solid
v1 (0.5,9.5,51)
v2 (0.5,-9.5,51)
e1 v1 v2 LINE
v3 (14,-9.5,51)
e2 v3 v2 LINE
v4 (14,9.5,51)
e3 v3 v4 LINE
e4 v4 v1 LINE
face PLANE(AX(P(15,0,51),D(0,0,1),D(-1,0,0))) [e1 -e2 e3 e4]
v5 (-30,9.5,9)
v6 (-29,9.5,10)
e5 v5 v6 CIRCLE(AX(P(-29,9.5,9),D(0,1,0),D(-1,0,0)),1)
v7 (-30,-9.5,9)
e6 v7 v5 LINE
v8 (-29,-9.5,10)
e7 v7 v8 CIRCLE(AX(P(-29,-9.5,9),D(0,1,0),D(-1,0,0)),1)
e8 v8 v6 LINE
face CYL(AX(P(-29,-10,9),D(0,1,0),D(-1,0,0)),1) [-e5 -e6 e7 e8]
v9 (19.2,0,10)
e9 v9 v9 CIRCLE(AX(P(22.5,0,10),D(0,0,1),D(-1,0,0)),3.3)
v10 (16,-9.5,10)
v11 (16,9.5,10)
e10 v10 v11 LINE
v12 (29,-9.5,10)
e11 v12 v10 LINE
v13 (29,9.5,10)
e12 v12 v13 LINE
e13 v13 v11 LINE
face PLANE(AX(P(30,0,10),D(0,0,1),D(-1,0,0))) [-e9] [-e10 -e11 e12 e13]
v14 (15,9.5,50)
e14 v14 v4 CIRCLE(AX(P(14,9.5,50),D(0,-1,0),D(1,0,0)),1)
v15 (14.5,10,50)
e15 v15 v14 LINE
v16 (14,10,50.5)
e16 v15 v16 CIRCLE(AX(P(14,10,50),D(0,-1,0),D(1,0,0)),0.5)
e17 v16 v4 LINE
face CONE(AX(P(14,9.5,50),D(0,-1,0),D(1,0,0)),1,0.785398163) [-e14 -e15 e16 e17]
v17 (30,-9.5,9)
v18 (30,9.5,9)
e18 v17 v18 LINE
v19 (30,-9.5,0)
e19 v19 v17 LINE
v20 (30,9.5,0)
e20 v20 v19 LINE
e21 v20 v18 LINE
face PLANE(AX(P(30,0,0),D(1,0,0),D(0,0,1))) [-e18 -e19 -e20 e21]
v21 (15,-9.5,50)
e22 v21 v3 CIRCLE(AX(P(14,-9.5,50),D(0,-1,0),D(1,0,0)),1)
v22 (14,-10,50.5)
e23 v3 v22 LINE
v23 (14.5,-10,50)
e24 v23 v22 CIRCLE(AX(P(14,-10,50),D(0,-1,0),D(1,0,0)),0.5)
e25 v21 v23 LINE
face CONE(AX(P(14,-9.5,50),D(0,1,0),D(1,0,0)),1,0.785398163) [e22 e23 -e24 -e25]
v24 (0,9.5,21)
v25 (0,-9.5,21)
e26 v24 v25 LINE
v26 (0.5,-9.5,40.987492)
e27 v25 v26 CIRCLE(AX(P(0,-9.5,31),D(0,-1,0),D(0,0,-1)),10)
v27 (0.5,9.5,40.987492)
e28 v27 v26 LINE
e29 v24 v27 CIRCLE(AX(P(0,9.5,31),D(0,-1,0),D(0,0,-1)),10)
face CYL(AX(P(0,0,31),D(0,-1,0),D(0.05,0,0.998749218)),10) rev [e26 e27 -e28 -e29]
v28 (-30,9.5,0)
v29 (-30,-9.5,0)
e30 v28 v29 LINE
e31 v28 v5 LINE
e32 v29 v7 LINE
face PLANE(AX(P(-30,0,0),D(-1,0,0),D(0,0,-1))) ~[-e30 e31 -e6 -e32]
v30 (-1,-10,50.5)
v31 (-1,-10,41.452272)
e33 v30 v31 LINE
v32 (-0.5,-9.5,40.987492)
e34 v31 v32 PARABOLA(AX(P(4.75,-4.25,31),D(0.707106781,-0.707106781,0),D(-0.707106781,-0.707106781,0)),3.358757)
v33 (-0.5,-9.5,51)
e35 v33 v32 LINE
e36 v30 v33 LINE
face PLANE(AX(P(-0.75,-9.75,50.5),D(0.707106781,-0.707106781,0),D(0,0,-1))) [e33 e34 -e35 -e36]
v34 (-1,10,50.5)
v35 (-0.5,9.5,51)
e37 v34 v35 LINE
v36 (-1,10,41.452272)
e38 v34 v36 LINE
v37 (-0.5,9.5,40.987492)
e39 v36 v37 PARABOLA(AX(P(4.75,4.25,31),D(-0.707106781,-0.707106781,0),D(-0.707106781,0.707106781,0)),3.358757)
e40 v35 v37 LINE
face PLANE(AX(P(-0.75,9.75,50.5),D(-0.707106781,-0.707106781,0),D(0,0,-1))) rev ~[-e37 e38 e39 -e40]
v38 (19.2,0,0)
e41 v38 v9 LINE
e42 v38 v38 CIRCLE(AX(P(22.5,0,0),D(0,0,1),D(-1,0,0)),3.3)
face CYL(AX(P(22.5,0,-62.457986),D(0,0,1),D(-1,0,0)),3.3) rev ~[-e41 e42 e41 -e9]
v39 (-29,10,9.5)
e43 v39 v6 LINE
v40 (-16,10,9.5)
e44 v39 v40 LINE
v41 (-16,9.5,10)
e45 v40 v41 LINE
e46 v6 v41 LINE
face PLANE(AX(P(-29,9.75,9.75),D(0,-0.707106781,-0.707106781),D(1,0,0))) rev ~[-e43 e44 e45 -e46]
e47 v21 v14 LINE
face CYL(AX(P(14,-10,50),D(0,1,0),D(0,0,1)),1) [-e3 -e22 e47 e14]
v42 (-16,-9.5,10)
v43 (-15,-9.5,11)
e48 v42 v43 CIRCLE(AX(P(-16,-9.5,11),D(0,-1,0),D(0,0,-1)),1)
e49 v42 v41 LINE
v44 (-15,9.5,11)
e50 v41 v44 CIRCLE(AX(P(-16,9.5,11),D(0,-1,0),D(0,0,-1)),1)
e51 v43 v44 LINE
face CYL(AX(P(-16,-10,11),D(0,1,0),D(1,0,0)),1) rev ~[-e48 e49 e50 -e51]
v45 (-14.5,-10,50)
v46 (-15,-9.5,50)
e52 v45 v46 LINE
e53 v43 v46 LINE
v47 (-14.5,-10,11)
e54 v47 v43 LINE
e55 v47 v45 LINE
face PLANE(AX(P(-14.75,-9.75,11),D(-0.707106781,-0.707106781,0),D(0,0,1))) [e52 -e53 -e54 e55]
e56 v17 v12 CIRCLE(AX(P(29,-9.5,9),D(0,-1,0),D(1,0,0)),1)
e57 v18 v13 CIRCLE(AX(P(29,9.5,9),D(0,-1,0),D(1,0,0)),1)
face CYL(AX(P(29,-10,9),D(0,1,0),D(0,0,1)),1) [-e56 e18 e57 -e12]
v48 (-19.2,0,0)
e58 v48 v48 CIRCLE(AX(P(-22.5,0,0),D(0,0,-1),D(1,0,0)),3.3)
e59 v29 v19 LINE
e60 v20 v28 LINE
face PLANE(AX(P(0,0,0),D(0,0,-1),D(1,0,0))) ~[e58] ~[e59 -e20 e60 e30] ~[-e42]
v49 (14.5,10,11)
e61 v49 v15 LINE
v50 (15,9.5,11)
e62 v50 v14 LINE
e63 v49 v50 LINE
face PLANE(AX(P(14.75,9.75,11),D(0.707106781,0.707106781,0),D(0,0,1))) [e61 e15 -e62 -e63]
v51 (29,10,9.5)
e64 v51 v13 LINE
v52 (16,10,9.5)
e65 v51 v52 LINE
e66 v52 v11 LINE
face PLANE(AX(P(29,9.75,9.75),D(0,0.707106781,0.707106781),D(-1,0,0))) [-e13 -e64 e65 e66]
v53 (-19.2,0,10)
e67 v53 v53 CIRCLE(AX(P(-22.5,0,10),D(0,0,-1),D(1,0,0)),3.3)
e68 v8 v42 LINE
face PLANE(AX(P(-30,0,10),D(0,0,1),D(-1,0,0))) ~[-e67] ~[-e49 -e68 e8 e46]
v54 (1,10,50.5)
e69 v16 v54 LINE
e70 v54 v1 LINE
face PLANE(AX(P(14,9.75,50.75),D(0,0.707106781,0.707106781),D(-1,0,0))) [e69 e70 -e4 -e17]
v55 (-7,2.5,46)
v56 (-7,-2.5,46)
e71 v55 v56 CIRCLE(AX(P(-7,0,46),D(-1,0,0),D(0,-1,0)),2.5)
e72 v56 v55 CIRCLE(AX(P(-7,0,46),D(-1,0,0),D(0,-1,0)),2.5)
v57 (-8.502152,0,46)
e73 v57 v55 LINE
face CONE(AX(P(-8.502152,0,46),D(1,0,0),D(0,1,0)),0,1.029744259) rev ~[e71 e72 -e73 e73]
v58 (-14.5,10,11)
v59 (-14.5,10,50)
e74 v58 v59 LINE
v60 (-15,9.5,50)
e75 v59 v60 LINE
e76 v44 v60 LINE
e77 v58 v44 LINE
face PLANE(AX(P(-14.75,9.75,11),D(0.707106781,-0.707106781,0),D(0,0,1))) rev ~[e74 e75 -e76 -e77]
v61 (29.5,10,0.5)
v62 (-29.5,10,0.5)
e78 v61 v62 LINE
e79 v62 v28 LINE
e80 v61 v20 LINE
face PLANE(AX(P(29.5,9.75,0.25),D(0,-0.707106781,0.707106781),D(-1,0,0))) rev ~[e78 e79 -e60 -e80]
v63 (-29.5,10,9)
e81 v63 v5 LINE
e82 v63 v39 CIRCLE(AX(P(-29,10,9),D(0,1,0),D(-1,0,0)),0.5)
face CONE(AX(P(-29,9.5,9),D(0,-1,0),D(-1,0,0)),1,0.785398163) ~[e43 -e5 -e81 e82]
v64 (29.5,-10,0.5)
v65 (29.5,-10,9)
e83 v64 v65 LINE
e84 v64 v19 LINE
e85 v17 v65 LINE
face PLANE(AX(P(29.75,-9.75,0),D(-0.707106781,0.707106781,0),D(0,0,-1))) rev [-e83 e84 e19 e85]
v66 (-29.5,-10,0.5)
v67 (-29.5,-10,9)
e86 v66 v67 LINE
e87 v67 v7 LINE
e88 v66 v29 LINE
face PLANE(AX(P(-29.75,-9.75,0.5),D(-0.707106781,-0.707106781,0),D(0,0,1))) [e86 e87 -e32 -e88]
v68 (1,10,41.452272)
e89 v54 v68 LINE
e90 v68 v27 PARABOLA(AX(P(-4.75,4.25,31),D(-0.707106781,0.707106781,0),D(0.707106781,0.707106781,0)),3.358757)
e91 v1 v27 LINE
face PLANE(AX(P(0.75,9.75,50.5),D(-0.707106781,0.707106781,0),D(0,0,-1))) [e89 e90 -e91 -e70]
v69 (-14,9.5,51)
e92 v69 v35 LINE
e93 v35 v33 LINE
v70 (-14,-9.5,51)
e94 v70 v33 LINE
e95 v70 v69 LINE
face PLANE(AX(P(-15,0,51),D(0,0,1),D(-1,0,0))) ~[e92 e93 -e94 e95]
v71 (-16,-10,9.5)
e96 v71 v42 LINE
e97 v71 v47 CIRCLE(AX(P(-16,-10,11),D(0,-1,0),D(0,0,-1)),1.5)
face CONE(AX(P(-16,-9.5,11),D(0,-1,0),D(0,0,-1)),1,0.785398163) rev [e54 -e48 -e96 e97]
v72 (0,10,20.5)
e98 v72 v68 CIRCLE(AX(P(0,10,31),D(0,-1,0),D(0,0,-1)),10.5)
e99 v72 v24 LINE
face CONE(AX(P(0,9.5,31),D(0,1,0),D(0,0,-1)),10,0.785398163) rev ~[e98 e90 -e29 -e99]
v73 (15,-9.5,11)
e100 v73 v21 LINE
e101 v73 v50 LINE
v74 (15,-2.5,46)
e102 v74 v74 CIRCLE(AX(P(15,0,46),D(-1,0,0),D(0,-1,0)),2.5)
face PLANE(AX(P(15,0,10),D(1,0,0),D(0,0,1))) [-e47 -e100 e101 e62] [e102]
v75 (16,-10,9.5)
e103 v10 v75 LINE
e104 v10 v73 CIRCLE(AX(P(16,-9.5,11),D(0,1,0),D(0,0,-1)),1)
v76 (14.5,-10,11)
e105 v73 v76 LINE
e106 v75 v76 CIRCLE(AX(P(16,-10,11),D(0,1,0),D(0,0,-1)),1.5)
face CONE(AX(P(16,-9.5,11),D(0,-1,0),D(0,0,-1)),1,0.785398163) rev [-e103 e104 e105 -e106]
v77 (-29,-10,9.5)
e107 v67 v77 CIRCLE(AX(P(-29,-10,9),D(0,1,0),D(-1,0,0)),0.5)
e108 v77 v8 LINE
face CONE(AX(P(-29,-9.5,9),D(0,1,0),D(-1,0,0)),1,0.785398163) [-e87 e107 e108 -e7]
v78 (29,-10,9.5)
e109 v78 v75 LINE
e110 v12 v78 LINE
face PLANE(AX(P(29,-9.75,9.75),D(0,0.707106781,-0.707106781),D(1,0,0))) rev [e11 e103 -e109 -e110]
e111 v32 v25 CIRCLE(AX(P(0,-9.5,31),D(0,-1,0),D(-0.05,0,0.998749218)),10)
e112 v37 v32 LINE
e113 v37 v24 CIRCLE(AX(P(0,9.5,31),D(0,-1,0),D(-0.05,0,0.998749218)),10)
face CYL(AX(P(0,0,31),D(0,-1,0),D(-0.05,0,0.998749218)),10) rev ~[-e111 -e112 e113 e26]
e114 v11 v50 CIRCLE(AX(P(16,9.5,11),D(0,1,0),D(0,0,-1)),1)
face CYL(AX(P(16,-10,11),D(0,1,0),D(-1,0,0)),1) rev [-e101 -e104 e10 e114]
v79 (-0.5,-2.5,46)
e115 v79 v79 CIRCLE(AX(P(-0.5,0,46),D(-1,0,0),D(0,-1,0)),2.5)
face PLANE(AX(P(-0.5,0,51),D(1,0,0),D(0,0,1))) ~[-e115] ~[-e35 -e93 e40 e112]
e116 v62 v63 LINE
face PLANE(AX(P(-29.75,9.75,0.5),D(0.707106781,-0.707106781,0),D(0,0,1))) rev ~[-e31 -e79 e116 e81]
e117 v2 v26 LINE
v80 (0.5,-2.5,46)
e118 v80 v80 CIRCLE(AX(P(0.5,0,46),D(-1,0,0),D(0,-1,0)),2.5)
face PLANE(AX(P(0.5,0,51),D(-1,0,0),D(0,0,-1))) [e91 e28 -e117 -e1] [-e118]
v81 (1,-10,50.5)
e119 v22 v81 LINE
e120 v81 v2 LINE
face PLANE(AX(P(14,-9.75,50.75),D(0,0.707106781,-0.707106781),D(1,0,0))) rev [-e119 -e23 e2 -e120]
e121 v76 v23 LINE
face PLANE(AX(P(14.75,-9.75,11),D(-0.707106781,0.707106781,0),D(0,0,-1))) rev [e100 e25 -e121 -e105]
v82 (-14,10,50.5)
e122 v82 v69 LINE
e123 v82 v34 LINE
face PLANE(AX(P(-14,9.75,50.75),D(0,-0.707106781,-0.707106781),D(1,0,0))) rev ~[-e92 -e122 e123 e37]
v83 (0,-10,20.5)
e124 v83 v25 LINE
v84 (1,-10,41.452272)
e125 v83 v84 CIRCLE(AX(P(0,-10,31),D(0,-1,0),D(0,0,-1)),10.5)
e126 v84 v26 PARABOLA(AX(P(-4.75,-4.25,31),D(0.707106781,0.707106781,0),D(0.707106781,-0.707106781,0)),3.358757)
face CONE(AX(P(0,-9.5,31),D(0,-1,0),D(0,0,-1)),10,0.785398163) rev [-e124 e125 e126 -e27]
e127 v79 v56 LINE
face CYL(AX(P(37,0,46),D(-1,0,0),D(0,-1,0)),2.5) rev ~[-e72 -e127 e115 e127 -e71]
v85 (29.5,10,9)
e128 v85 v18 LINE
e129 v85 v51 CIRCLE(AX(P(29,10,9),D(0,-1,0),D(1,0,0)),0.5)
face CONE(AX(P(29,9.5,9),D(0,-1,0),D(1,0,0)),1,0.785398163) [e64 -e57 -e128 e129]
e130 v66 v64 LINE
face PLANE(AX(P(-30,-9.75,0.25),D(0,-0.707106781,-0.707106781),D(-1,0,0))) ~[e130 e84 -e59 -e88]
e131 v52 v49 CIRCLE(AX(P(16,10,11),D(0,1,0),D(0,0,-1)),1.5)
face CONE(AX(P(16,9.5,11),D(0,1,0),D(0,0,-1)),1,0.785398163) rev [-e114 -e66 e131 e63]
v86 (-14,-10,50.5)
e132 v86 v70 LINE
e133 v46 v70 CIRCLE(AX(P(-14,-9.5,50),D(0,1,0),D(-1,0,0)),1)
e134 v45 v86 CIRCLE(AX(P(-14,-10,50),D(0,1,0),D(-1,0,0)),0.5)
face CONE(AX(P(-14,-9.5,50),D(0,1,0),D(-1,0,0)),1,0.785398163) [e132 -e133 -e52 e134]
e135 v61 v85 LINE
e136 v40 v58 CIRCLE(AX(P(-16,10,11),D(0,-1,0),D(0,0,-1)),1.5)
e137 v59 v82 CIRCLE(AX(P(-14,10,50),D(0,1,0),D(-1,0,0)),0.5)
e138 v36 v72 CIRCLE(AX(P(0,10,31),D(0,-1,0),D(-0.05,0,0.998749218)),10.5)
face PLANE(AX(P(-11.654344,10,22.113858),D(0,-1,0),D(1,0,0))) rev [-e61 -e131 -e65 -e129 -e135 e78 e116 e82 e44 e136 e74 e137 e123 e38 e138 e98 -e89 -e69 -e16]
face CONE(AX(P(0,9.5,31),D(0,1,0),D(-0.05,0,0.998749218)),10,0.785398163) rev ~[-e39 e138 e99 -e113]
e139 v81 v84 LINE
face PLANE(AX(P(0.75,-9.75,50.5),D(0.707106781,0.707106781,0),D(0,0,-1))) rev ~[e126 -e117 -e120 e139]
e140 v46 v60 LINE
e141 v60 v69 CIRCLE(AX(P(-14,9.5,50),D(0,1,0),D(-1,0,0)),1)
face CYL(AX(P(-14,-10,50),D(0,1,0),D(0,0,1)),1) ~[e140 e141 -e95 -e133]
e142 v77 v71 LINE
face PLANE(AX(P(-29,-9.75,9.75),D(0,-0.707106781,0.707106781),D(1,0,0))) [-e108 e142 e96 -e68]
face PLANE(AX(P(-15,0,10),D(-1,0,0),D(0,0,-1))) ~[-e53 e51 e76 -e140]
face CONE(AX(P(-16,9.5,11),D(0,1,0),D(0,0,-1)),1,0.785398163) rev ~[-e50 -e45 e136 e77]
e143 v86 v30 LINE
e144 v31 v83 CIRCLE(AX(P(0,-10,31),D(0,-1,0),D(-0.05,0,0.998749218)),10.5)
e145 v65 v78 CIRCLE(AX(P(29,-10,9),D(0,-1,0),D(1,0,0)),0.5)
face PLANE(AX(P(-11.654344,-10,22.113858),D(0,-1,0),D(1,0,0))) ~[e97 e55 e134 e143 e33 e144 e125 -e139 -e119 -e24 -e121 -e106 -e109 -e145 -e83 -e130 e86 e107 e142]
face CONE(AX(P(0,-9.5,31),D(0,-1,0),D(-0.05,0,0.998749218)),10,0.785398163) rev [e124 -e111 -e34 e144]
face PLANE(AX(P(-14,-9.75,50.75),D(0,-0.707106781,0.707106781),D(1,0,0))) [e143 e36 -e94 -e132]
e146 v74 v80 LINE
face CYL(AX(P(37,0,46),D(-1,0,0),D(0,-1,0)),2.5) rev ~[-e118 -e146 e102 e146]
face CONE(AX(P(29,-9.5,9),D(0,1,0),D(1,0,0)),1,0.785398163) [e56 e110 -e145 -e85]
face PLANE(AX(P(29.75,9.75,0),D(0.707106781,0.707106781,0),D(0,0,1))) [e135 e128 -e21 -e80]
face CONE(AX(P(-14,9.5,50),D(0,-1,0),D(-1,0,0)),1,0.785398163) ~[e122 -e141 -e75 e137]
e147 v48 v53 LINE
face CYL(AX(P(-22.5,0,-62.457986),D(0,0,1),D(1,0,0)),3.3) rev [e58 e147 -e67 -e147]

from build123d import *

# Parameters (mm, degrees)
F1_DEPTH    = 10
F3_D        = 6.6
F6_D        = 5
F6_DEPTH    = 22
F6_TIP      = 1.5021515476
F7_R        = 1
F8_C1_SIZE  = 0.5
F8_C2_SIZE  = 0.5
F8_C3_SIZE  = 0.5
F8_C4_SIZE  = 0.5
F8_C5_SIZE  = 0.5
F8_C6_SIZE  = 0.5
F8_C7_SIZE  = 0.5
F8_C8_SIZE  = 0.5
F8_C9_SIZE  = 0.5
F8_C10_SIZE = 0.5
F8_C11_SIZE = 0.5
F8_C12_SIZE = 0.5


with BuildPart() as f1:
    # F0 (on Front) → F1 (new body, symmetric)
    with BuildSketch(Plane.XZ):
        with BuildLine():
            Line((15, 51), (0.5, 51))
            Line((0.5, 51), (0.5, 40.9874921777))
            ThreePointArc((0.5, 40.9874921777), (9.9968725554, 30.7499217894), (0, 21))
            Line((0, 21), (0, 0))
            Line((0, 0), (30, 0))
            Line((30, 0), (30, 10))
            Line((30, 10), (15, 10))
            Line((15, 10), (15, 51))
        make_face()
    extrude(amount=F1_DEPTH, both=True)

    # F3 (through all)
    with Locations(Plane(origin=(0, 0, 0), x_dir=(1, 0, 0), z_dir=(0, 0, -1))):
        with Locations((22.5, 0)):
            Hole(F3_D / 2)

    # F4: F1 across plane


with BuildPart() as f1_1:
    add(f1.part)
    add(f1.part.mirror(Plane.YZ))

    # F6
    with Locations(Plane.YZ.offset(15)):
        with Locations((0, 46)):
            Hole(F6_D / 2, depth=F6_DEPTH)
            with Locations((0, 0, -(F6_DEPTH + F6_TIP / 2))):  # 118° drill point
                Cone(0, F6_D / 2, F6_TIP, mode=Mode.SUBTRACT)

    # F7
    f7_edges = [f1_1.edges().sort_by_distance(p)[0] for p in [
        (15, 0, 10),
        (-15, 0, 10),
        (-30, 0, 10),
        (30, 0, 10),
        (15, 0, 51),
        (-15, 0, 51),
    ]]
    fillet(f7_edges, radius=F7_R)

    # F8: chamfer of 0.5 on 36 edges, made by hand

    # F8_c1
    f8_c1_edges = [f1_1.edges().sort_by_distance(p)[0] for p in [
        (30, 10, 4.5),
        (29.7071067812, 10, 9.7071067812),
        (22.5, 10, 10),
        (15.2928932188, 10, 10.2928932188),
        (15, 10, 30.5),
        (14.7071067812, 10, 50.7071067812),
        (7.25, 10, 51),
    ]]
    chamfer(f8_c1_edges, length=F8_C1_SIZE)

    # F8_c2
    f8_c2_edges = [f1_1.edges().sort_by_distance(p)[0] for p in [
        (-0.25, 10, 0),
    ]]
    chamfer(f8_c2_edges, length=F8_C2_SIZE)

    # F8_c3
    f8_c3_edges = [f1_1.edges().sort_by_distance(p)[0] for p in [
        (-30, 10, 4.75),
        (-29.7071067812, 10, 9.7071067812),
        (-22.5, 10, 10),
        (-15.2928932188, 10, 10.2928932188),
        (-15, 10, 30.5),
        (-14.7071067812, 10, 50.7071067812),
        (-7.25, 10, 51),
    ]]
    chamfer(f8_c3_edges, length=F8_C3_SIZE)

    # F8_c4
    f8_c4_edges = [f1_1.edges().sort_by_distance(p)[0] for p in [
        (0.5, 10, 45.7437460889),
    ]]
    chamfer(f8_c4_edges, length=F8_C4_SIZE)

    # F8_c5
    f8_c5_edges = [f1_1.edges().sort_by_distance(p)[0] for p in [
        (-0.2507065513, 10, 21.0031431827),
    ]]
    chamfer(f8_c5_edges, length=F8_C5_SIZE)

    # F8_c6
    f8_c6_edges = [f1_1.edges().sort_by_distance(p)[0] for p in [
        (-0.5, 10, 45.9940442409),
    ]]
    chamfer(f8_c6_edges, length=F8_C6_SIZE)

    # F8_c7
    f8_c7_edges = [f1_1.edges().sort_by_distance(p)[0] for p in [
        (30, -10, 4.5),
        (29.7071067812, -10, 9.7071067812),
        (22.5, -10, 10),
        (15.2928932188, -10, 10.2928932188),
        (15, -10, 30.5),
        (14.7071067812, -10, 50.7071067812),
        (7.25, -10, 51),
    ]]
    chamfer(f8_c7_edges, length=F8_C7_SIZE)

    # F8_c8
    f8_c8_edges = [f1_1.edges().sort_by_distance(p)[0] for p in [
        (-0.25, -10, 0),
    ]]
    chamfer(f8_c8_edges, length=F8_C8_SIZE)

    # F8_c9
    f8_c9_edges = [f1_1.edges().sort_by_distance(p)[0] for p in [
        (-30, -10, 4.75),
        (-29.7071067812, -10, 9.7071067812),
        (-22.5, -10, 10),
        (-15.2928932188, -10, 10.2928932188),
        (-15, -10, 30.5),
        (-14.7071067812, -10, 50.7071067812),
        (-7.25, -10, 51),
    ]]
    chamfer(f8_c9_edges, length=F8_C9_SIZE)

    # F8_c10
    f8_c10_edges = [f1_1.edges().sort_by_distance(p)[0] for p in [
        (0.5, -10, 45.7437460889),
    ]]
    chamfer(f8_c10_edges, length=F8_C10_SIZE)

    # F8_c11
    f8_c11_edges = [f1_1.edges().sort_by_distance(p)[0] for p in [
        (-0.2507065513, -10, 21.0031431827),
    ]]
    chamfer(f8_c11_edges, length=F8_C11_SIZE)

    # F8_c12
    f8_c12_edges = [f1_1.edges().sort_by_distance(p)[0] for p in [
        (-0.5, -10, 45.9940442409),
    ]]
    chamfer(f8_c12_edges, length=F8_C12_SIZE)


solid = f1_1.part
